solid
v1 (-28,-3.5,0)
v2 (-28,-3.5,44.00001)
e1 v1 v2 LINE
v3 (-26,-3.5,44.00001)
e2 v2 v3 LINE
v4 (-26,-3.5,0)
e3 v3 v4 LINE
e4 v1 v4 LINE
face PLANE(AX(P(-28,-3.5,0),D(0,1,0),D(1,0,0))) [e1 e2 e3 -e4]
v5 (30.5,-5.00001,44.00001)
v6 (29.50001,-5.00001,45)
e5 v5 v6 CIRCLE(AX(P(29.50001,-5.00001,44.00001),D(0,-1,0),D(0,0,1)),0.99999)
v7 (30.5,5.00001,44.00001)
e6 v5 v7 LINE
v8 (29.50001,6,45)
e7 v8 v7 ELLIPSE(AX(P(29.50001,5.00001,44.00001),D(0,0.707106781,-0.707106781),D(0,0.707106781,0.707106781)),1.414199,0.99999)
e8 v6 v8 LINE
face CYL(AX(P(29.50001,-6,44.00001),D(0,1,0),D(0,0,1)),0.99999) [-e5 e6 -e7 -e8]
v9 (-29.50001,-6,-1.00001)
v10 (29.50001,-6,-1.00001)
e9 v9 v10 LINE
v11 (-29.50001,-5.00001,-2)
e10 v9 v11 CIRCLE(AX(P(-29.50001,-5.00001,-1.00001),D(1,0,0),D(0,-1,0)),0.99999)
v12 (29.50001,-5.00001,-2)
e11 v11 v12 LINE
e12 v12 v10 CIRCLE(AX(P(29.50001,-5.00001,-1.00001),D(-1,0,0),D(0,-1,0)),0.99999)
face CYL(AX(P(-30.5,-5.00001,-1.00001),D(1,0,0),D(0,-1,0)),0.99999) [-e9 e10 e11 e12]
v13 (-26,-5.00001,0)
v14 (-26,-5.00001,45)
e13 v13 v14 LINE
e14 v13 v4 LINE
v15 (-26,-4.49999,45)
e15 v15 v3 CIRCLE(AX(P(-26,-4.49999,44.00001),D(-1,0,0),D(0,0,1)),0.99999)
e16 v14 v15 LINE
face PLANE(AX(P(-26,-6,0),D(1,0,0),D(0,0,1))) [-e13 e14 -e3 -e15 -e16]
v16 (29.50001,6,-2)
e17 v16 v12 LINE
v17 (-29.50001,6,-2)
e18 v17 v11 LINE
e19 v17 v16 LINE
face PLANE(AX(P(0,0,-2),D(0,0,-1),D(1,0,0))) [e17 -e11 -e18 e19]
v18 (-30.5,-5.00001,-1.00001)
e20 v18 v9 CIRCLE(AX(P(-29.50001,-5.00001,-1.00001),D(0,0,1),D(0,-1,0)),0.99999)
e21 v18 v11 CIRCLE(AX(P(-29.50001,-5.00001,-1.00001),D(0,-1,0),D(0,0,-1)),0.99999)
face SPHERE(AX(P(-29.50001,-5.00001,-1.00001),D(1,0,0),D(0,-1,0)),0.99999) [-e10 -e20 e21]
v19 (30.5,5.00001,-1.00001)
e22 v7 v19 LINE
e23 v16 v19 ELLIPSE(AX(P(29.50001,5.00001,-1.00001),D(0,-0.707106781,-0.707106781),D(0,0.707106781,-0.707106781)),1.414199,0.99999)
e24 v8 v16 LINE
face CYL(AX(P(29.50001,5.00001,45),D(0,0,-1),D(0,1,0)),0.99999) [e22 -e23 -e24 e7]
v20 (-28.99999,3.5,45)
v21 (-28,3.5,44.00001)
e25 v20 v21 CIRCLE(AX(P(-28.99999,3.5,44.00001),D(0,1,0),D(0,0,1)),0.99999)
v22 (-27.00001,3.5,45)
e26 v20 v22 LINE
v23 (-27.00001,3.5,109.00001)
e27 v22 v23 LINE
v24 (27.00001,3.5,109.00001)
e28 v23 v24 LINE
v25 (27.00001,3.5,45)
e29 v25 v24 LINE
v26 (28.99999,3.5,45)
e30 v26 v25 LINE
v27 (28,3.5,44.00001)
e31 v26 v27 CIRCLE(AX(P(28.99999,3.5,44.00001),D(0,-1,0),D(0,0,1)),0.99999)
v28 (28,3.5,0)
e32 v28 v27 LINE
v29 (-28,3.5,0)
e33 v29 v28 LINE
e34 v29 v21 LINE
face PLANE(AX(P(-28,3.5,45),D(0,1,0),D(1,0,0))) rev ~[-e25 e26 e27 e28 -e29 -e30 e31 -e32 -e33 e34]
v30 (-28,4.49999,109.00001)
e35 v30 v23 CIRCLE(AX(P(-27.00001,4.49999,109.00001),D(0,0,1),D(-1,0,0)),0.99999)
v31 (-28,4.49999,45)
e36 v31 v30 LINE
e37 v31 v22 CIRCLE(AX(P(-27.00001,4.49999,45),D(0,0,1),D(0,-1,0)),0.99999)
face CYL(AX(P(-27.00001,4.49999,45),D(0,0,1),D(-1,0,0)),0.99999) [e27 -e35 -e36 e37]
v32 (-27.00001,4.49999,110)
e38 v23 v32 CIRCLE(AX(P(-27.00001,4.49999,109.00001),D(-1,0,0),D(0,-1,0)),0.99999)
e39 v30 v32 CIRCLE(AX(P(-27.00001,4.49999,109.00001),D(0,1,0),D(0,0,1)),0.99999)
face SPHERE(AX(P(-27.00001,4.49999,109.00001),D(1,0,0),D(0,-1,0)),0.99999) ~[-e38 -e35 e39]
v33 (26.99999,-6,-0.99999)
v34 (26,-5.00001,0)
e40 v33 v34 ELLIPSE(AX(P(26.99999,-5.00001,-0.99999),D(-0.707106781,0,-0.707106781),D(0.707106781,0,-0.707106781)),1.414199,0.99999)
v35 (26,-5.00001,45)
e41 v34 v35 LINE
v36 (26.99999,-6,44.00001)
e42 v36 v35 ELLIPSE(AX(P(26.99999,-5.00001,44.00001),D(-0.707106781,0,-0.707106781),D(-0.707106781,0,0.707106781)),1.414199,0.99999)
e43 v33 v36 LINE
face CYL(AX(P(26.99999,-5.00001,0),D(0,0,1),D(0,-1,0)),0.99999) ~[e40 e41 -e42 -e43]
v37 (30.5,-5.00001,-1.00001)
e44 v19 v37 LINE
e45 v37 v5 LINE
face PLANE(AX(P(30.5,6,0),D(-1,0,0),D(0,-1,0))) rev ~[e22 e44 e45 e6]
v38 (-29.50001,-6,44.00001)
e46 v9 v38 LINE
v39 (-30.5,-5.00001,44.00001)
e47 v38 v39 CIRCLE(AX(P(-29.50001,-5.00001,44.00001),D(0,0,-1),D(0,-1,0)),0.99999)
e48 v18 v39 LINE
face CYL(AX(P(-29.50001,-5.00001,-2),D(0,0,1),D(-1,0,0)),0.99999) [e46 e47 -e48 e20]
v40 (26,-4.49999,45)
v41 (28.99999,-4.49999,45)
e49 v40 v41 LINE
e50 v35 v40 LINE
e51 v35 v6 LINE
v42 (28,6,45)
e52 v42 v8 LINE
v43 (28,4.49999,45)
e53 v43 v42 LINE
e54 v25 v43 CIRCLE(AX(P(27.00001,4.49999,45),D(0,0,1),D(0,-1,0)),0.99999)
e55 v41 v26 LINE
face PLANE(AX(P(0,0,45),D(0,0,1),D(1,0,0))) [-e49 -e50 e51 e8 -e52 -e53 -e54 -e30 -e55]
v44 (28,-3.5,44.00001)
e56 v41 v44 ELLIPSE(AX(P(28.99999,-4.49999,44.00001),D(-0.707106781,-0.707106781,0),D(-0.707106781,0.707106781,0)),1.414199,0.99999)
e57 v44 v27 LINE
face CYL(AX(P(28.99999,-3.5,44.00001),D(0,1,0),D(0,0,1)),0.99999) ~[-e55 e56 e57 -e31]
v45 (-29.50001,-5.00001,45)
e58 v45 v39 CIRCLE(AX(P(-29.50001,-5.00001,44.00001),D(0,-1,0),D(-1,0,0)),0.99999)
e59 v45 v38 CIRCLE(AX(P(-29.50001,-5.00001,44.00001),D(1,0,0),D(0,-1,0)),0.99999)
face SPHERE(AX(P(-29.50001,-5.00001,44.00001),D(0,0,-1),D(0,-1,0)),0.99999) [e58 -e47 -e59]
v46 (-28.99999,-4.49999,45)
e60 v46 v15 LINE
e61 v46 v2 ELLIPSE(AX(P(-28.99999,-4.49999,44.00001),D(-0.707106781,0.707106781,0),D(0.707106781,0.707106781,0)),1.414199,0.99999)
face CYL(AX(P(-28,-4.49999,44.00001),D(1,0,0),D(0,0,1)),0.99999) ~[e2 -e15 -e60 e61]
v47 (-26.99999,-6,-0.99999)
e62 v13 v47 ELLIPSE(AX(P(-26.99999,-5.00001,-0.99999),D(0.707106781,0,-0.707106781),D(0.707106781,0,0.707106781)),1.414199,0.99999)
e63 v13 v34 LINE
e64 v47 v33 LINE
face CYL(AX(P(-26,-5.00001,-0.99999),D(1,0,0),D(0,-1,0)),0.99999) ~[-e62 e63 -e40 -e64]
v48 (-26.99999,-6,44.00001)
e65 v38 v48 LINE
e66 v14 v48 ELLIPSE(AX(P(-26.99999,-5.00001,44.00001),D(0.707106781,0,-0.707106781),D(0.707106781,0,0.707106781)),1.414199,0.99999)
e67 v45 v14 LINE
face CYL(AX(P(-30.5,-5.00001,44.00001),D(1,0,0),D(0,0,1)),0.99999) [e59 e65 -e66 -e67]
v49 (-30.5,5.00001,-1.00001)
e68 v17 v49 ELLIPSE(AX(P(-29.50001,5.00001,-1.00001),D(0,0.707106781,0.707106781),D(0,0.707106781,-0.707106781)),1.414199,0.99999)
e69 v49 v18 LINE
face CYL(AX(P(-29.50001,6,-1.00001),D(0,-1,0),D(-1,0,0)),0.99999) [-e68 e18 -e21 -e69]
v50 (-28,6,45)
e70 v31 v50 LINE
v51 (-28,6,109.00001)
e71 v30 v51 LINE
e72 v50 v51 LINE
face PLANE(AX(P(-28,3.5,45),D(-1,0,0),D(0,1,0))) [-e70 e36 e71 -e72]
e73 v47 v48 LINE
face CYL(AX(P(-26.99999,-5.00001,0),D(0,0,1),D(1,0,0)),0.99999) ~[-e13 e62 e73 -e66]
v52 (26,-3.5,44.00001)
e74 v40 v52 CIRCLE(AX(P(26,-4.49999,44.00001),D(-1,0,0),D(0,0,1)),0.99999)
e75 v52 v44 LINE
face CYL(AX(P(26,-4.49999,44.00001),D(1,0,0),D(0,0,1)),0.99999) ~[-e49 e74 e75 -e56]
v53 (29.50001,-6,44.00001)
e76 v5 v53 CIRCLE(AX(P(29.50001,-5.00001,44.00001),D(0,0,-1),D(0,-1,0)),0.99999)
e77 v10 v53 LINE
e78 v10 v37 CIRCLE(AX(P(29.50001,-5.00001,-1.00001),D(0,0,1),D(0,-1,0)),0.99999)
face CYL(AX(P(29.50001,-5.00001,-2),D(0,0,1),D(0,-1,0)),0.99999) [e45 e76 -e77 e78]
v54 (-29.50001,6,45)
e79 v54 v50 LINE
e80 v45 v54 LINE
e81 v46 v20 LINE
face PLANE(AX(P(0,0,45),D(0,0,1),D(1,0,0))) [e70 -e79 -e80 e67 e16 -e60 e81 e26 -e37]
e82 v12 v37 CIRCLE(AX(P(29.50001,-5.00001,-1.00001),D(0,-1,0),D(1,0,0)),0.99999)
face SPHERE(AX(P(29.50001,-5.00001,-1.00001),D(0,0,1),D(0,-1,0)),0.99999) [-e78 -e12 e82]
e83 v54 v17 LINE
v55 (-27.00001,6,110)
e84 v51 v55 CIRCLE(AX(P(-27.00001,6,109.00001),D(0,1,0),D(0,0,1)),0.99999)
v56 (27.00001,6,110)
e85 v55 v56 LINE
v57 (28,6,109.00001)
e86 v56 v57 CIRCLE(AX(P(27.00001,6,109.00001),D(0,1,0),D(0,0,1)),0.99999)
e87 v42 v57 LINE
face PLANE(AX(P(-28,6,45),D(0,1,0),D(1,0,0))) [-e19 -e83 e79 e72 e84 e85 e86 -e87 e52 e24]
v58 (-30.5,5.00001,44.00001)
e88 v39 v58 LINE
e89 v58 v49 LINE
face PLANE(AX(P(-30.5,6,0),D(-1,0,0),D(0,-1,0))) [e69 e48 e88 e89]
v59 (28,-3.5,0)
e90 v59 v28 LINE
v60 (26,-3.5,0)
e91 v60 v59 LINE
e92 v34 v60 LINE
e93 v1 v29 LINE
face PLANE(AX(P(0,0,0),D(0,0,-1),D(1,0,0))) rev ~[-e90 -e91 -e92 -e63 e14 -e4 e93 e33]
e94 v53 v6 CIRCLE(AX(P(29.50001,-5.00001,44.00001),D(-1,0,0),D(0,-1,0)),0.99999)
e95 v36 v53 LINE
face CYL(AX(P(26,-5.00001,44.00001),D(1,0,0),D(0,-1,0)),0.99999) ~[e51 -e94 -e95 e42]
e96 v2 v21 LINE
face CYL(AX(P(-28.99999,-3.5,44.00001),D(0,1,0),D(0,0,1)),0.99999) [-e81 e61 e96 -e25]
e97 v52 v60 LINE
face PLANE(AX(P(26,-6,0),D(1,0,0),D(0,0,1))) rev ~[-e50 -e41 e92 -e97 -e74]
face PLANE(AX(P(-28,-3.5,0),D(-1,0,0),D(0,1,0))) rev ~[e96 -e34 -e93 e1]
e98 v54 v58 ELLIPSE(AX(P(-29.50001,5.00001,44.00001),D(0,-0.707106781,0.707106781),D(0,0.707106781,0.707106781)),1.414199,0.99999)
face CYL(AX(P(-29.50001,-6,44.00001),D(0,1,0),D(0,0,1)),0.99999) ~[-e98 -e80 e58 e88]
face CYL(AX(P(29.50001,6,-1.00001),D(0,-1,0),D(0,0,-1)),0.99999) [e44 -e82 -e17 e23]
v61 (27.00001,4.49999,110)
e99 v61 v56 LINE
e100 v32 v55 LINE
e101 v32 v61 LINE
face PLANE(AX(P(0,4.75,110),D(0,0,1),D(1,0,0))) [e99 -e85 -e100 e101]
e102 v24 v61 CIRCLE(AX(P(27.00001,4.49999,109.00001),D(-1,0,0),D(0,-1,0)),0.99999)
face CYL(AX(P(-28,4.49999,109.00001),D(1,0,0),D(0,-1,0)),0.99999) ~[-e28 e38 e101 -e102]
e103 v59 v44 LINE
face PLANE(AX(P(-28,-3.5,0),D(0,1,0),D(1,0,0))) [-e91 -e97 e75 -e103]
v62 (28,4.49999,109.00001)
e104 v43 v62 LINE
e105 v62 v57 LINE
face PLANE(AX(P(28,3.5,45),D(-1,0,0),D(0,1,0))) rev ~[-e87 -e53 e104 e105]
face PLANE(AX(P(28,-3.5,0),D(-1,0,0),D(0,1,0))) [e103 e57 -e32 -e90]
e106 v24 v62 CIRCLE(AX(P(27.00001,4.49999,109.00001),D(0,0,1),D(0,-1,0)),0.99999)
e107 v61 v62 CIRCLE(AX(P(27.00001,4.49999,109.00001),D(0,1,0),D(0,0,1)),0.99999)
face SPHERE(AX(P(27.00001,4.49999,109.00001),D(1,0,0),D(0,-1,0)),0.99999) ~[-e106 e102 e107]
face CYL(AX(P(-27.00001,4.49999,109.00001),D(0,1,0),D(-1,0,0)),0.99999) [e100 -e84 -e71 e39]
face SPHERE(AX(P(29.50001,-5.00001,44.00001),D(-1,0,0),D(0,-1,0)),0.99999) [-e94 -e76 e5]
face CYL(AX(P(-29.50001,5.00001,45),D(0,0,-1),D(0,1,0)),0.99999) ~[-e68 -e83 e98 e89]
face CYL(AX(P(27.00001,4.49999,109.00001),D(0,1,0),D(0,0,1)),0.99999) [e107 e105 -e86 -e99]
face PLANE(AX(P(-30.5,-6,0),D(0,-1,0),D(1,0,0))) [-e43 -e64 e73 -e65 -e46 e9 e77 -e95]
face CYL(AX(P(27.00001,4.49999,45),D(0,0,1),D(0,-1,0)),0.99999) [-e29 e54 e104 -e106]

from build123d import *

# Parameters (mm, degrees)
F0_W     = 61
F0_H     = 12
F0_W_2   = 56
F0_H_2   = 7
F1_DEPTH = 45
F2_W     = 52
F2_H     = 45
F3_DEPTH = 3
F4_W     = 61
F4_H     = 12
F5_DEPTH = 2
F6_W     = 56
F6_H     = 2.5
F7_DEPTH = 65
F8_R     = 0.99999
F9_R     = 0.99999


# Not quite as in the source:
# - a fillet or chamfer is up to 0.001 mm smaller than in the source, because OpenCascade refuses the exact size


with BuildPart() as f1:
    # F0 (on Top) → F1 (new body)
    with BuildSketch(Plane.XY):
        Rectangle(F0_W, F0_H)
        Rectangle(F0_W_2, F0_H_2, mode=Mode.SUBTRACT)
    extrude(amount=F1_DEPTH)

    # F2 (on face) → F3 (cut)
    with BuildSketch(Plane.XZ.offset(6)):
        with Locations((0, 22.5)):
            Rectangle(F2_W, F2_H)
    extrude(amount=-F3_DEPTH, mode=Mode.SUBTRACT)

    # F4 (on face) → F5 (join)
    with BuildSketch(Plane(origin=(0, 0, 0), x_dir=(1, 0, 0), z_dir=(0, 0, -1))):
        Rectangle(F4_W, F4_H)
    extrude(amount=F5_DEPTH)

    # F6 (on face) → F7 (join)
    with BuildSketch(Plane.XY.offset(45)):
        with Locations((0, 4.75)):
            Rectangle(F6_W, F6_H)
    extrude(amount=F7_DEPTH)

    # F8 (radius 1 in the source; OpenCascade refuses exactly that, so slightly less here)
    f8_edges = [f1.edges().sort_by_distance(p)[0] for p in [
        (-26, -6, 22.5),
        (0, -6, 0),
        (26, -6, 22.5),
        (28.25, -6, 45),
        (30.5, -6, 21.5),
        (0, -6, -2),
        (-30.5, -6, 21.5),
        (-28.25, -6, 45),
        (-28, 0, 45),
        (28, 0, 45),
        (27, -3.5, 45),
        (-27, -3.5, 45),
        (-30.5, 0, 45),
        (30.5, 0, 45),
        (30.5, 6, 21.5),
        (30.5, 0, -2),
        (-30.5, 6, 21.5),
        (-30.5, 0, -2),
        (0, 3.5, 110),
    ]]
    fillet(f8_edges, radius=F8_R)

    # F9 (radius 1 in the source; OpenCascade refuses exactly that, so slightly less here)
    f9_edges = [f1.edges().sort_by_distance(p)[0] for p in [
        (-28, 3.5, 77.000005),
        (28, 3.5, 77.000005),
    ]]
    fillet(f9_edges, radius=F9_R)


solid = f1.part
